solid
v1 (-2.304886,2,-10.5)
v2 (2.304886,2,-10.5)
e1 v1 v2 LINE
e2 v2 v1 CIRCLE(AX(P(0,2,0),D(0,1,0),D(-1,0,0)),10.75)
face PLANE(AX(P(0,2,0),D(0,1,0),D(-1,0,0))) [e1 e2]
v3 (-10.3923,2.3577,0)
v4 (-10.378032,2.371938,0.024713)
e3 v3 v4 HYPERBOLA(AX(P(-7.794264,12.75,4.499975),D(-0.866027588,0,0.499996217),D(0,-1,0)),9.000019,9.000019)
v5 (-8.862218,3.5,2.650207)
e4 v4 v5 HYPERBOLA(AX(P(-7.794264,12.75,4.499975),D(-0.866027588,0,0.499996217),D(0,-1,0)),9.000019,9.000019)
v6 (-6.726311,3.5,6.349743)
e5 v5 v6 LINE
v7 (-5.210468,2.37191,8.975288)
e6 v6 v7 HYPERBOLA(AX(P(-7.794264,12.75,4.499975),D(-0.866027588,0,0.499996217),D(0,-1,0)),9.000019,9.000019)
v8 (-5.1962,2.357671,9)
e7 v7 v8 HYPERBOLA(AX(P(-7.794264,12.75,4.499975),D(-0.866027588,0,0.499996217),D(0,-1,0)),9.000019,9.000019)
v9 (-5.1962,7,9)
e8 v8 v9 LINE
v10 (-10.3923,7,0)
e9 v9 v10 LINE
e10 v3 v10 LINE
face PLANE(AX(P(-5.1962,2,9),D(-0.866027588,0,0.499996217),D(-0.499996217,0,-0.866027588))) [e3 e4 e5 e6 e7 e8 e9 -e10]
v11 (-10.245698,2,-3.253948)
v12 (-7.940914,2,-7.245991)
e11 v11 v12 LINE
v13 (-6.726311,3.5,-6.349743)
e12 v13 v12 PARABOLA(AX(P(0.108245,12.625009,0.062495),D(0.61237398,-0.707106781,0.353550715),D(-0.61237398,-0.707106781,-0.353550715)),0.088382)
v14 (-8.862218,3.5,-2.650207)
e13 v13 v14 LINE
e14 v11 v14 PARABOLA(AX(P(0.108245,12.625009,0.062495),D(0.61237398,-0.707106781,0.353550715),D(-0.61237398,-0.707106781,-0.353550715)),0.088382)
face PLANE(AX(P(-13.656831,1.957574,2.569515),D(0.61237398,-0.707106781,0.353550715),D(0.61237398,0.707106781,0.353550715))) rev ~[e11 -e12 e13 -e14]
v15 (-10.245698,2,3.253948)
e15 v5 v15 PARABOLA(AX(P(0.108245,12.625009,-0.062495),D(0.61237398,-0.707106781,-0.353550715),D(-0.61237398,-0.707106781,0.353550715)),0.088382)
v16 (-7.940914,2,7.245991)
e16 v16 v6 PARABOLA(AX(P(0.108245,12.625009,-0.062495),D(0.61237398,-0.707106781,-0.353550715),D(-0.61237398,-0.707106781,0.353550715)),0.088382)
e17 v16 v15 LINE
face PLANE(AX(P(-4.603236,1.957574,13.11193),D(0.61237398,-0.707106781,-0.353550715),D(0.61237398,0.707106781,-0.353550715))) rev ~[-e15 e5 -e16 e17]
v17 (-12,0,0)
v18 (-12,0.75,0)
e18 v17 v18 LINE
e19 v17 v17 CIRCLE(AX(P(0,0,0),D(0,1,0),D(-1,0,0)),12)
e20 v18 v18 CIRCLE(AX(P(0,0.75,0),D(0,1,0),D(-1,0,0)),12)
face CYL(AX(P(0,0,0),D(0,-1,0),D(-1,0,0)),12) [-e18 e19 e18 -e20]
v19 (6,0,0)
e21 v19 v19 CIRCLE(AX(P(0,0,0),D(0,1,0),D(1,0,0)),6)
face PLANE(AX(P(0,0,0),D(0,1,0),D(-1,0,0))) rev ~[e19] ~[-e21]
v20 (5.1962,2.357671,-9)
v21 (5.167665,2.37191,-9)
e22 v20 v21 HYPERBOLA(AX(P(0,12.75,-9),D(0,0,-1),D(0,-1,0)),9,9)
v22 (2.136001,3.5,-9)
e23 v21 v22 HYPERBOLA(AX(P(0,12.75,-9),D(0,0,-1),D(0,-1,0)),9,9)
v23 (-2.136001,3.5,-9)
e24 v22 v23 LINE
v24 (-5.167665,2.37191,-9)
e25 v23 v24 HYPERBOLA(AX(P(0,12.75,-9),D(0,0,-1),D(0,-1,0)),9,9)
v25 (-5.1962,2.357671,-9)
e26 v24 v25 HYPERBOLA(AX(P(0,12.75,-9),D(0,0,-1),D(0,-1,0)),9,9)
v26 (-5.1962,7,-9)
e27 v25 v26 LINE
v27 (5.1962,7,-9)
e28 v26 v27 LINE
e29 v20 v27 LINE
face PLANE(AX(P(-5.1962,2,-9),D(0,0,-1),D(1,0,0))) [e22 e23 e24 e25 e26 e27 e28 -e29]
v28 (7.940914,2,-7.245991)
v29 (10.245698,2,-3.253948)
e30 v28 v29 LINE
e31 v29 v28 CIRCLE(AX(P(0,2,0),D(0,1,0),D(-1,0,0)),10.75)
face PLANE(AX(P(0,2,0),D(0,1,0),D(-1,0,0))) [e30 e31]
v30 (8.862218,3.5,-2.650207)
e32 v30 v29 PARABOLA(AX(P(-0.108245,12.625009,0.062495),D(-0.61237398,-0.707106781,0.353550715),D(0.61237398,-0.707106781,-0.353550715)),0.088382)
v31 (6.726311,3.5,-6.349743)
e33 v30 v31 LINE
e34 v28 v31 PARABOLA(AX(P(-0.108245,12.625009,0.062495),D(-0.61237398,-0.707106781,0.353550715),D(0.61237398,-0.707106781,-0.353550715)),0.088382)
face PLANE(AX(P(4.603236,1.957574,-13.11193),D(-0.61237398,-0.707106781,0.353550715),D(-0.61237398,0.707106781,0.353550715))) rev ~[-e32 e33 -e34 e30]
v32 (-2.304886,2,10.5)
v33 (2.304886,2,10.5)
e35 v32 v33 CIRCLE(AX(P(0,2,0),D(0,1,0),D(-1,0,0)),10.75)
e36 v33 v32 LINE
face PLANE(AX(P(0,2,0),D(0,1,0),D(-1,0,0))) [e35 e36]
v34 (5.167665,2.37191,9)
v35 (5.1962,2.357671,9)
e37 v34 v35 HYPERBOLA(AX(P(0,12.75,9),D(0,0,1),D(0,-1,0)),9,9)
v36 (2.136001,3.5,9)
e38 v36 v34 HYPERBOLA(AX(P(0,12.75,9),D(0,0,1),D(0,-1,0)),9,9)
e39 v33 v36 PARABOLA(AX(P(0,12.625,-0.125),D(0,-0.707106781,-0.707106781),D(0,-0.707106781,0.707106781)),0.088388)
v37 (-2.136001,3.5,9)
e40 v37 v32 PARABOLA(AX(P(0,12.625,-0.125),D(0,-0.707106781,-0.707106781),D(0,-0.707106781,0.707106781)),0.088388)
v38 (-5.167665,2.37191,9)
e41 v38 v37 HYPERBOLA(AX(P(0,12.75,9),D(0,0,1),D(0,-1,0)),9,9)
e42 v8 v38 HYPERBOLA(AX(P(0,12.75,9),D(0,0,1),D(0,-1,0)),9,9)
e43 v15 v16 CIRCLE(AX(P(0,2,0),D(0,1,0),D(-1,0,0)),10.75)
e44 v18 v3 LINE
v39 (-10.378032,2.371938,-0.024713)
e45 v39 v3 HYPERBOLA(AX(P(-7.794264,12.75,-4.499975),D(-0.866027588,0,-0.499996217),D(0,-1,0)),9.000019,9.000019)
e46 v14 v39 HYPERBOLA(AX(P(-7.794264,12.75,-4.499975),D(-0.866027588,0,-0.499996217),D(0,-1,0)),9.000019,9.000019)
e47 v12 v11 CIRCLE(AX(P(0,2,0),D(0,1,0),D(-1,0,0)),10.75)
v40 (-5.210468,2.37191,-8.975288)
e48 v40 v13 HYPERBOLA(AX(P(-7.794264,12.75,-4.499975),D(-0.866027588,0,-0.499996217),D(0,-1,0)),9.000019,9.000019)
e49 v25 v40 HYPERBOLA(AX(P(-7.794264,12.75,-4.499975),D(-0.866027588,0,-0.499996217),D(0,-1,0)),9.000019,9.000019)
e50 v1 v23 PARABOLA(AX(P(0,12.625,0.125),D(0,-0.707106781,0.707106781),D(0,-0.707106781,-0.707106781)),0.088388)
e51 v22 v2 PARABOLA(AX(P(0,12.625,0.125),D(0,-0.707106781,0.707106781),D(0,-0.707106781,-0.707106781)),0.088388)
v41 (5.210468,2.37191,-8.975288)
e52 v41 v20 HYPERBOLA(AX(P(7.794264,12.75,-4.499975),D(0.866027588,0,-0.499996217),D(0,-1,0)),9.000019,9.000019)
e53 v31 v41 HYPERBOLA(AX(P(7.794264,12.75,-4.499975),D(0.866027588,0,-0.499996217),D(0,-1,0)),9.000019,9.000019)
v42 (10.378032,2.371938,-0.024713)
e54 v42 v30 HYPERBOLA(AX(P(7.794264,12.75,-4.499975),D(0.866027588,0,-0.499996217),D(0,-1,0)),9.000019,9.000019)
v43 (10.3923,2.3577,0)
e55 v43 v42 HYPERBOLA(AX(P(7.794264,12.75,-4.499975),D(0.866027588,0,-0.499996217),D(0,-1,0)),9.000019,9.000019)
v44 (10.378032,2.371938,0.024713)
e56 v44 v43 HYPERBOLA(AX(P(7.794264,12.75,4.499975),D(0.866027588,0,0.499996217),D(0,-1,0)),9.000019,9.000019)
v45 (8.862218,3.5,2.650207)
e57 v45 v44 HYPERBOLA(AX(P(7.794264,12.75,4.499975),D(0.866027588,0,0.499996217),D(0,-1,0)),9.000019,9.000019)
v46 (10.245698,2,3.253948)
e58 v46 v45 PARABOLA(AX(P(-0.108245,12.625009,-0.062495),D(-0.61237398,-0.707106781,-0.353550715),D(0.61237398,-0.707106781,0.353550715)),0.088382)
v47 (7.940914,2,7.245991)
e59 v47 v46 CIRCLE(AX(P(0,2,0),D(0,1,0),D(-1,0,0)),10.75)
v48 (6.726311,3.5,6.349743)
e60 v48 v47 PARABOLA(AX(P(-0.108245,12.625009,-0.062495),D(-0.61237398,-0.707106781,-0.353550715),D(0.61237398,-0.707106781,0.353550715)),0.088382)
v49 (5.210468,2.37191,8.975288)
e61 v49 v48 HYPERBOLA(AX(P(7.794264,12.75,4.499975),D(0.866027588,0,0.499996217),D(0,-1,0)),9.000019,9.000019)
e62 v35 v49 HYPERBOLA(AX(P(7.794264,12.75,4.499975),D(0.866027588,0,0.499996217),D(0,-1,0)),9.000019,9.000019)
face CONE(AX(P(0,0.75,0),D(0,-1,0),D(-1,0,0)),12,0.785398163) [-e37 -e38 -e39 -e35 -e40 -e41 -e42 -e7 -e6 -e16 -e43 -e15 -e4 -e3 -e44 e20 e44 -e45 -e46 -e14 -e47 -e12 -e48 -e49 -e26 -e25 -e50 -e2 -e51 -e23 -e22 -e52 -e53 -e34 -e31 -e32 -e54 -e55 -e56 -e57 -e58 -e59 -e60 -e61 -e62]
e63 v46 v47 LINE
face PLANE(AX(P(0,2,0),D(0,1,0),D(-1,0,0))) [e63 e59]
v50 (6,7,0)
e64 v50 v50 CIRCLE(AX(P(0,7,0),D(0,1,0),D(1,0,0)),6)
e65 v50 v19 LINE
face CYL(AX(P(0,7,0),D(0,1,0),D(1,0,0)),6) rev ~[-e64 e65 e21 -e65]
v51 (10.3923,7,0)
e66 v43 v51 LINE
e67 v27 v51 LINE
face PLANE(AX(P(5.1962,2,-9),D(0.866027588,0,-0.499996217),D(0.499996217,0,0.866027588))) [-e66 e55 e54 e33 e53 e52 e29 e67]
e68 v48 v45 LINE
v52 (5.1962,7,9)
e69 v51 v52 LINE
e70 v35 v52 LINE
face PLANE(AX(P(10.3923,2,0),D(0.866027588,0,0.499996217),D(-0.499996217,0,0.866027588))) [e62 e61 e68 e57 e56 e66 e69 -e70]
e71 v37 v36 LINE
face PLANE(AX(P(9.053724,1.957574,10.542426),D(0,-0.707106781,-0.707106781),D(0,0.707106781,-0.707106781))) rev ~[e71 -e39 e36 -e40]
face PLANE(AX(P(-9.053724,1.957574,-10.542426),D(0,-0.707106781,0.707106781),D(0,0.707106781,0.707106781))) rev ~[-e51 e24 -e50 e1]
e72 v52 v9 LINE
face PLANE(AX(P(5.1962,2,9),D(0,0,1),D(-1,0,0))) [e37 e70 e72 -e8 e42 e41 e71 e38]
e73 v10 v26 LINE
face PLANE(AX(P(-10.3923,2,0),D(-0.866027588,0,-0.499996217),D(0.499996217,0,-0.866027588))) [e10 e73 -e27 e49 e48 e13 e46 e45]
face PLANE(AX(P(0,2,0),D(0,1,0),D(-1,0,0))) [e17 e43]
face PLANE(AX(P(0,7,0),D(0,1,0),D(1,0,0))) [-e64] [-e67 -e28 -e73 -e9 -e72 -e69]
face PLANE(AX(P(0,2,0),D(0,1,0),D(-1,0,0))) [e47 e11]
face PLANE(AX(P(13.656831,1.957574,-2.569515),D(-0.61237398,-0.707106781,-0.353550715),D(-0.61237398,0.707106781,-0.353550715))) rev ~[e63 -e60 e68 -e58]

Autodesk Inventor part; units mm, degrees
ref_plane "YZ Plane" through (0, 0, 0) normal (1, 0, 0) x (0, 1, 0)
ref_plane "XZ Plane" through (0, 0, 0) normal (0, 1, 0) x (-1, 0, 0)
ref_plane "XY Plane" through (0, 0, 0) normal (0, 0, 1) x (1, 0, 0)
sketch "Sketch2" plane through (0, 0, 0) normal (0, 1, 0) x (-1, 0, 0)
  circle A0 centre (0, 0) radius 12
  dimension "d3" = 24
extrude "Extrusion1" add sketch "Sketch2" along normal blind 2
sketch "Sketch3" plane through (0, 2, 0) normal (0, 1, 0) x (1, 0, 0)
  line L0 (5.1962, 9) -> (10.3923, 0)
  line L1 (10.3923, 0) -> (5.1962, -9)
  line L2 (5.1962, -9) -> (-5.1962, -9)
  line L3 (-5.1962, -9) -> (-10.3923, 0)
  line L4 (-10.3923, 0) -> (-5.1962, 9)
  line L5 (-5.1962, 9) -> (5.1962, 9)
  point P0 (0, 0)
  point P1 (0, 0)
  dimension "d2" = 18
extrude "Extrusion2" add sketch "Sketch3" along normal blind 5
chamfer "Chamfer1" distance 1.25 angle 45 1 edges at (12, 2, 0)
sketch "Sketch4" plane through (0, 7, 0) normal (0, 1, 0) x (1, 0, 0)
  circle A0 centre (0, 0) radius 6
  dimension "d9" = 12
extrude "Extrusion3" cut sketch "Sketch4" against normal through all
chamfer "Chamfer2" distance 1.5 angle 45 6 edges at (7.7942, 2, 4.5) (7.7942, 2, -4.5) (0, 2, -9) (-7.7942, 2, -4.5) (0, 2, 9) (-7.7942, 2, 4.5)
thread "Thread1" size "M12x1.75" class "6H" standard "ISO Metric profile" full length
properties part number "Nylon Nut"
